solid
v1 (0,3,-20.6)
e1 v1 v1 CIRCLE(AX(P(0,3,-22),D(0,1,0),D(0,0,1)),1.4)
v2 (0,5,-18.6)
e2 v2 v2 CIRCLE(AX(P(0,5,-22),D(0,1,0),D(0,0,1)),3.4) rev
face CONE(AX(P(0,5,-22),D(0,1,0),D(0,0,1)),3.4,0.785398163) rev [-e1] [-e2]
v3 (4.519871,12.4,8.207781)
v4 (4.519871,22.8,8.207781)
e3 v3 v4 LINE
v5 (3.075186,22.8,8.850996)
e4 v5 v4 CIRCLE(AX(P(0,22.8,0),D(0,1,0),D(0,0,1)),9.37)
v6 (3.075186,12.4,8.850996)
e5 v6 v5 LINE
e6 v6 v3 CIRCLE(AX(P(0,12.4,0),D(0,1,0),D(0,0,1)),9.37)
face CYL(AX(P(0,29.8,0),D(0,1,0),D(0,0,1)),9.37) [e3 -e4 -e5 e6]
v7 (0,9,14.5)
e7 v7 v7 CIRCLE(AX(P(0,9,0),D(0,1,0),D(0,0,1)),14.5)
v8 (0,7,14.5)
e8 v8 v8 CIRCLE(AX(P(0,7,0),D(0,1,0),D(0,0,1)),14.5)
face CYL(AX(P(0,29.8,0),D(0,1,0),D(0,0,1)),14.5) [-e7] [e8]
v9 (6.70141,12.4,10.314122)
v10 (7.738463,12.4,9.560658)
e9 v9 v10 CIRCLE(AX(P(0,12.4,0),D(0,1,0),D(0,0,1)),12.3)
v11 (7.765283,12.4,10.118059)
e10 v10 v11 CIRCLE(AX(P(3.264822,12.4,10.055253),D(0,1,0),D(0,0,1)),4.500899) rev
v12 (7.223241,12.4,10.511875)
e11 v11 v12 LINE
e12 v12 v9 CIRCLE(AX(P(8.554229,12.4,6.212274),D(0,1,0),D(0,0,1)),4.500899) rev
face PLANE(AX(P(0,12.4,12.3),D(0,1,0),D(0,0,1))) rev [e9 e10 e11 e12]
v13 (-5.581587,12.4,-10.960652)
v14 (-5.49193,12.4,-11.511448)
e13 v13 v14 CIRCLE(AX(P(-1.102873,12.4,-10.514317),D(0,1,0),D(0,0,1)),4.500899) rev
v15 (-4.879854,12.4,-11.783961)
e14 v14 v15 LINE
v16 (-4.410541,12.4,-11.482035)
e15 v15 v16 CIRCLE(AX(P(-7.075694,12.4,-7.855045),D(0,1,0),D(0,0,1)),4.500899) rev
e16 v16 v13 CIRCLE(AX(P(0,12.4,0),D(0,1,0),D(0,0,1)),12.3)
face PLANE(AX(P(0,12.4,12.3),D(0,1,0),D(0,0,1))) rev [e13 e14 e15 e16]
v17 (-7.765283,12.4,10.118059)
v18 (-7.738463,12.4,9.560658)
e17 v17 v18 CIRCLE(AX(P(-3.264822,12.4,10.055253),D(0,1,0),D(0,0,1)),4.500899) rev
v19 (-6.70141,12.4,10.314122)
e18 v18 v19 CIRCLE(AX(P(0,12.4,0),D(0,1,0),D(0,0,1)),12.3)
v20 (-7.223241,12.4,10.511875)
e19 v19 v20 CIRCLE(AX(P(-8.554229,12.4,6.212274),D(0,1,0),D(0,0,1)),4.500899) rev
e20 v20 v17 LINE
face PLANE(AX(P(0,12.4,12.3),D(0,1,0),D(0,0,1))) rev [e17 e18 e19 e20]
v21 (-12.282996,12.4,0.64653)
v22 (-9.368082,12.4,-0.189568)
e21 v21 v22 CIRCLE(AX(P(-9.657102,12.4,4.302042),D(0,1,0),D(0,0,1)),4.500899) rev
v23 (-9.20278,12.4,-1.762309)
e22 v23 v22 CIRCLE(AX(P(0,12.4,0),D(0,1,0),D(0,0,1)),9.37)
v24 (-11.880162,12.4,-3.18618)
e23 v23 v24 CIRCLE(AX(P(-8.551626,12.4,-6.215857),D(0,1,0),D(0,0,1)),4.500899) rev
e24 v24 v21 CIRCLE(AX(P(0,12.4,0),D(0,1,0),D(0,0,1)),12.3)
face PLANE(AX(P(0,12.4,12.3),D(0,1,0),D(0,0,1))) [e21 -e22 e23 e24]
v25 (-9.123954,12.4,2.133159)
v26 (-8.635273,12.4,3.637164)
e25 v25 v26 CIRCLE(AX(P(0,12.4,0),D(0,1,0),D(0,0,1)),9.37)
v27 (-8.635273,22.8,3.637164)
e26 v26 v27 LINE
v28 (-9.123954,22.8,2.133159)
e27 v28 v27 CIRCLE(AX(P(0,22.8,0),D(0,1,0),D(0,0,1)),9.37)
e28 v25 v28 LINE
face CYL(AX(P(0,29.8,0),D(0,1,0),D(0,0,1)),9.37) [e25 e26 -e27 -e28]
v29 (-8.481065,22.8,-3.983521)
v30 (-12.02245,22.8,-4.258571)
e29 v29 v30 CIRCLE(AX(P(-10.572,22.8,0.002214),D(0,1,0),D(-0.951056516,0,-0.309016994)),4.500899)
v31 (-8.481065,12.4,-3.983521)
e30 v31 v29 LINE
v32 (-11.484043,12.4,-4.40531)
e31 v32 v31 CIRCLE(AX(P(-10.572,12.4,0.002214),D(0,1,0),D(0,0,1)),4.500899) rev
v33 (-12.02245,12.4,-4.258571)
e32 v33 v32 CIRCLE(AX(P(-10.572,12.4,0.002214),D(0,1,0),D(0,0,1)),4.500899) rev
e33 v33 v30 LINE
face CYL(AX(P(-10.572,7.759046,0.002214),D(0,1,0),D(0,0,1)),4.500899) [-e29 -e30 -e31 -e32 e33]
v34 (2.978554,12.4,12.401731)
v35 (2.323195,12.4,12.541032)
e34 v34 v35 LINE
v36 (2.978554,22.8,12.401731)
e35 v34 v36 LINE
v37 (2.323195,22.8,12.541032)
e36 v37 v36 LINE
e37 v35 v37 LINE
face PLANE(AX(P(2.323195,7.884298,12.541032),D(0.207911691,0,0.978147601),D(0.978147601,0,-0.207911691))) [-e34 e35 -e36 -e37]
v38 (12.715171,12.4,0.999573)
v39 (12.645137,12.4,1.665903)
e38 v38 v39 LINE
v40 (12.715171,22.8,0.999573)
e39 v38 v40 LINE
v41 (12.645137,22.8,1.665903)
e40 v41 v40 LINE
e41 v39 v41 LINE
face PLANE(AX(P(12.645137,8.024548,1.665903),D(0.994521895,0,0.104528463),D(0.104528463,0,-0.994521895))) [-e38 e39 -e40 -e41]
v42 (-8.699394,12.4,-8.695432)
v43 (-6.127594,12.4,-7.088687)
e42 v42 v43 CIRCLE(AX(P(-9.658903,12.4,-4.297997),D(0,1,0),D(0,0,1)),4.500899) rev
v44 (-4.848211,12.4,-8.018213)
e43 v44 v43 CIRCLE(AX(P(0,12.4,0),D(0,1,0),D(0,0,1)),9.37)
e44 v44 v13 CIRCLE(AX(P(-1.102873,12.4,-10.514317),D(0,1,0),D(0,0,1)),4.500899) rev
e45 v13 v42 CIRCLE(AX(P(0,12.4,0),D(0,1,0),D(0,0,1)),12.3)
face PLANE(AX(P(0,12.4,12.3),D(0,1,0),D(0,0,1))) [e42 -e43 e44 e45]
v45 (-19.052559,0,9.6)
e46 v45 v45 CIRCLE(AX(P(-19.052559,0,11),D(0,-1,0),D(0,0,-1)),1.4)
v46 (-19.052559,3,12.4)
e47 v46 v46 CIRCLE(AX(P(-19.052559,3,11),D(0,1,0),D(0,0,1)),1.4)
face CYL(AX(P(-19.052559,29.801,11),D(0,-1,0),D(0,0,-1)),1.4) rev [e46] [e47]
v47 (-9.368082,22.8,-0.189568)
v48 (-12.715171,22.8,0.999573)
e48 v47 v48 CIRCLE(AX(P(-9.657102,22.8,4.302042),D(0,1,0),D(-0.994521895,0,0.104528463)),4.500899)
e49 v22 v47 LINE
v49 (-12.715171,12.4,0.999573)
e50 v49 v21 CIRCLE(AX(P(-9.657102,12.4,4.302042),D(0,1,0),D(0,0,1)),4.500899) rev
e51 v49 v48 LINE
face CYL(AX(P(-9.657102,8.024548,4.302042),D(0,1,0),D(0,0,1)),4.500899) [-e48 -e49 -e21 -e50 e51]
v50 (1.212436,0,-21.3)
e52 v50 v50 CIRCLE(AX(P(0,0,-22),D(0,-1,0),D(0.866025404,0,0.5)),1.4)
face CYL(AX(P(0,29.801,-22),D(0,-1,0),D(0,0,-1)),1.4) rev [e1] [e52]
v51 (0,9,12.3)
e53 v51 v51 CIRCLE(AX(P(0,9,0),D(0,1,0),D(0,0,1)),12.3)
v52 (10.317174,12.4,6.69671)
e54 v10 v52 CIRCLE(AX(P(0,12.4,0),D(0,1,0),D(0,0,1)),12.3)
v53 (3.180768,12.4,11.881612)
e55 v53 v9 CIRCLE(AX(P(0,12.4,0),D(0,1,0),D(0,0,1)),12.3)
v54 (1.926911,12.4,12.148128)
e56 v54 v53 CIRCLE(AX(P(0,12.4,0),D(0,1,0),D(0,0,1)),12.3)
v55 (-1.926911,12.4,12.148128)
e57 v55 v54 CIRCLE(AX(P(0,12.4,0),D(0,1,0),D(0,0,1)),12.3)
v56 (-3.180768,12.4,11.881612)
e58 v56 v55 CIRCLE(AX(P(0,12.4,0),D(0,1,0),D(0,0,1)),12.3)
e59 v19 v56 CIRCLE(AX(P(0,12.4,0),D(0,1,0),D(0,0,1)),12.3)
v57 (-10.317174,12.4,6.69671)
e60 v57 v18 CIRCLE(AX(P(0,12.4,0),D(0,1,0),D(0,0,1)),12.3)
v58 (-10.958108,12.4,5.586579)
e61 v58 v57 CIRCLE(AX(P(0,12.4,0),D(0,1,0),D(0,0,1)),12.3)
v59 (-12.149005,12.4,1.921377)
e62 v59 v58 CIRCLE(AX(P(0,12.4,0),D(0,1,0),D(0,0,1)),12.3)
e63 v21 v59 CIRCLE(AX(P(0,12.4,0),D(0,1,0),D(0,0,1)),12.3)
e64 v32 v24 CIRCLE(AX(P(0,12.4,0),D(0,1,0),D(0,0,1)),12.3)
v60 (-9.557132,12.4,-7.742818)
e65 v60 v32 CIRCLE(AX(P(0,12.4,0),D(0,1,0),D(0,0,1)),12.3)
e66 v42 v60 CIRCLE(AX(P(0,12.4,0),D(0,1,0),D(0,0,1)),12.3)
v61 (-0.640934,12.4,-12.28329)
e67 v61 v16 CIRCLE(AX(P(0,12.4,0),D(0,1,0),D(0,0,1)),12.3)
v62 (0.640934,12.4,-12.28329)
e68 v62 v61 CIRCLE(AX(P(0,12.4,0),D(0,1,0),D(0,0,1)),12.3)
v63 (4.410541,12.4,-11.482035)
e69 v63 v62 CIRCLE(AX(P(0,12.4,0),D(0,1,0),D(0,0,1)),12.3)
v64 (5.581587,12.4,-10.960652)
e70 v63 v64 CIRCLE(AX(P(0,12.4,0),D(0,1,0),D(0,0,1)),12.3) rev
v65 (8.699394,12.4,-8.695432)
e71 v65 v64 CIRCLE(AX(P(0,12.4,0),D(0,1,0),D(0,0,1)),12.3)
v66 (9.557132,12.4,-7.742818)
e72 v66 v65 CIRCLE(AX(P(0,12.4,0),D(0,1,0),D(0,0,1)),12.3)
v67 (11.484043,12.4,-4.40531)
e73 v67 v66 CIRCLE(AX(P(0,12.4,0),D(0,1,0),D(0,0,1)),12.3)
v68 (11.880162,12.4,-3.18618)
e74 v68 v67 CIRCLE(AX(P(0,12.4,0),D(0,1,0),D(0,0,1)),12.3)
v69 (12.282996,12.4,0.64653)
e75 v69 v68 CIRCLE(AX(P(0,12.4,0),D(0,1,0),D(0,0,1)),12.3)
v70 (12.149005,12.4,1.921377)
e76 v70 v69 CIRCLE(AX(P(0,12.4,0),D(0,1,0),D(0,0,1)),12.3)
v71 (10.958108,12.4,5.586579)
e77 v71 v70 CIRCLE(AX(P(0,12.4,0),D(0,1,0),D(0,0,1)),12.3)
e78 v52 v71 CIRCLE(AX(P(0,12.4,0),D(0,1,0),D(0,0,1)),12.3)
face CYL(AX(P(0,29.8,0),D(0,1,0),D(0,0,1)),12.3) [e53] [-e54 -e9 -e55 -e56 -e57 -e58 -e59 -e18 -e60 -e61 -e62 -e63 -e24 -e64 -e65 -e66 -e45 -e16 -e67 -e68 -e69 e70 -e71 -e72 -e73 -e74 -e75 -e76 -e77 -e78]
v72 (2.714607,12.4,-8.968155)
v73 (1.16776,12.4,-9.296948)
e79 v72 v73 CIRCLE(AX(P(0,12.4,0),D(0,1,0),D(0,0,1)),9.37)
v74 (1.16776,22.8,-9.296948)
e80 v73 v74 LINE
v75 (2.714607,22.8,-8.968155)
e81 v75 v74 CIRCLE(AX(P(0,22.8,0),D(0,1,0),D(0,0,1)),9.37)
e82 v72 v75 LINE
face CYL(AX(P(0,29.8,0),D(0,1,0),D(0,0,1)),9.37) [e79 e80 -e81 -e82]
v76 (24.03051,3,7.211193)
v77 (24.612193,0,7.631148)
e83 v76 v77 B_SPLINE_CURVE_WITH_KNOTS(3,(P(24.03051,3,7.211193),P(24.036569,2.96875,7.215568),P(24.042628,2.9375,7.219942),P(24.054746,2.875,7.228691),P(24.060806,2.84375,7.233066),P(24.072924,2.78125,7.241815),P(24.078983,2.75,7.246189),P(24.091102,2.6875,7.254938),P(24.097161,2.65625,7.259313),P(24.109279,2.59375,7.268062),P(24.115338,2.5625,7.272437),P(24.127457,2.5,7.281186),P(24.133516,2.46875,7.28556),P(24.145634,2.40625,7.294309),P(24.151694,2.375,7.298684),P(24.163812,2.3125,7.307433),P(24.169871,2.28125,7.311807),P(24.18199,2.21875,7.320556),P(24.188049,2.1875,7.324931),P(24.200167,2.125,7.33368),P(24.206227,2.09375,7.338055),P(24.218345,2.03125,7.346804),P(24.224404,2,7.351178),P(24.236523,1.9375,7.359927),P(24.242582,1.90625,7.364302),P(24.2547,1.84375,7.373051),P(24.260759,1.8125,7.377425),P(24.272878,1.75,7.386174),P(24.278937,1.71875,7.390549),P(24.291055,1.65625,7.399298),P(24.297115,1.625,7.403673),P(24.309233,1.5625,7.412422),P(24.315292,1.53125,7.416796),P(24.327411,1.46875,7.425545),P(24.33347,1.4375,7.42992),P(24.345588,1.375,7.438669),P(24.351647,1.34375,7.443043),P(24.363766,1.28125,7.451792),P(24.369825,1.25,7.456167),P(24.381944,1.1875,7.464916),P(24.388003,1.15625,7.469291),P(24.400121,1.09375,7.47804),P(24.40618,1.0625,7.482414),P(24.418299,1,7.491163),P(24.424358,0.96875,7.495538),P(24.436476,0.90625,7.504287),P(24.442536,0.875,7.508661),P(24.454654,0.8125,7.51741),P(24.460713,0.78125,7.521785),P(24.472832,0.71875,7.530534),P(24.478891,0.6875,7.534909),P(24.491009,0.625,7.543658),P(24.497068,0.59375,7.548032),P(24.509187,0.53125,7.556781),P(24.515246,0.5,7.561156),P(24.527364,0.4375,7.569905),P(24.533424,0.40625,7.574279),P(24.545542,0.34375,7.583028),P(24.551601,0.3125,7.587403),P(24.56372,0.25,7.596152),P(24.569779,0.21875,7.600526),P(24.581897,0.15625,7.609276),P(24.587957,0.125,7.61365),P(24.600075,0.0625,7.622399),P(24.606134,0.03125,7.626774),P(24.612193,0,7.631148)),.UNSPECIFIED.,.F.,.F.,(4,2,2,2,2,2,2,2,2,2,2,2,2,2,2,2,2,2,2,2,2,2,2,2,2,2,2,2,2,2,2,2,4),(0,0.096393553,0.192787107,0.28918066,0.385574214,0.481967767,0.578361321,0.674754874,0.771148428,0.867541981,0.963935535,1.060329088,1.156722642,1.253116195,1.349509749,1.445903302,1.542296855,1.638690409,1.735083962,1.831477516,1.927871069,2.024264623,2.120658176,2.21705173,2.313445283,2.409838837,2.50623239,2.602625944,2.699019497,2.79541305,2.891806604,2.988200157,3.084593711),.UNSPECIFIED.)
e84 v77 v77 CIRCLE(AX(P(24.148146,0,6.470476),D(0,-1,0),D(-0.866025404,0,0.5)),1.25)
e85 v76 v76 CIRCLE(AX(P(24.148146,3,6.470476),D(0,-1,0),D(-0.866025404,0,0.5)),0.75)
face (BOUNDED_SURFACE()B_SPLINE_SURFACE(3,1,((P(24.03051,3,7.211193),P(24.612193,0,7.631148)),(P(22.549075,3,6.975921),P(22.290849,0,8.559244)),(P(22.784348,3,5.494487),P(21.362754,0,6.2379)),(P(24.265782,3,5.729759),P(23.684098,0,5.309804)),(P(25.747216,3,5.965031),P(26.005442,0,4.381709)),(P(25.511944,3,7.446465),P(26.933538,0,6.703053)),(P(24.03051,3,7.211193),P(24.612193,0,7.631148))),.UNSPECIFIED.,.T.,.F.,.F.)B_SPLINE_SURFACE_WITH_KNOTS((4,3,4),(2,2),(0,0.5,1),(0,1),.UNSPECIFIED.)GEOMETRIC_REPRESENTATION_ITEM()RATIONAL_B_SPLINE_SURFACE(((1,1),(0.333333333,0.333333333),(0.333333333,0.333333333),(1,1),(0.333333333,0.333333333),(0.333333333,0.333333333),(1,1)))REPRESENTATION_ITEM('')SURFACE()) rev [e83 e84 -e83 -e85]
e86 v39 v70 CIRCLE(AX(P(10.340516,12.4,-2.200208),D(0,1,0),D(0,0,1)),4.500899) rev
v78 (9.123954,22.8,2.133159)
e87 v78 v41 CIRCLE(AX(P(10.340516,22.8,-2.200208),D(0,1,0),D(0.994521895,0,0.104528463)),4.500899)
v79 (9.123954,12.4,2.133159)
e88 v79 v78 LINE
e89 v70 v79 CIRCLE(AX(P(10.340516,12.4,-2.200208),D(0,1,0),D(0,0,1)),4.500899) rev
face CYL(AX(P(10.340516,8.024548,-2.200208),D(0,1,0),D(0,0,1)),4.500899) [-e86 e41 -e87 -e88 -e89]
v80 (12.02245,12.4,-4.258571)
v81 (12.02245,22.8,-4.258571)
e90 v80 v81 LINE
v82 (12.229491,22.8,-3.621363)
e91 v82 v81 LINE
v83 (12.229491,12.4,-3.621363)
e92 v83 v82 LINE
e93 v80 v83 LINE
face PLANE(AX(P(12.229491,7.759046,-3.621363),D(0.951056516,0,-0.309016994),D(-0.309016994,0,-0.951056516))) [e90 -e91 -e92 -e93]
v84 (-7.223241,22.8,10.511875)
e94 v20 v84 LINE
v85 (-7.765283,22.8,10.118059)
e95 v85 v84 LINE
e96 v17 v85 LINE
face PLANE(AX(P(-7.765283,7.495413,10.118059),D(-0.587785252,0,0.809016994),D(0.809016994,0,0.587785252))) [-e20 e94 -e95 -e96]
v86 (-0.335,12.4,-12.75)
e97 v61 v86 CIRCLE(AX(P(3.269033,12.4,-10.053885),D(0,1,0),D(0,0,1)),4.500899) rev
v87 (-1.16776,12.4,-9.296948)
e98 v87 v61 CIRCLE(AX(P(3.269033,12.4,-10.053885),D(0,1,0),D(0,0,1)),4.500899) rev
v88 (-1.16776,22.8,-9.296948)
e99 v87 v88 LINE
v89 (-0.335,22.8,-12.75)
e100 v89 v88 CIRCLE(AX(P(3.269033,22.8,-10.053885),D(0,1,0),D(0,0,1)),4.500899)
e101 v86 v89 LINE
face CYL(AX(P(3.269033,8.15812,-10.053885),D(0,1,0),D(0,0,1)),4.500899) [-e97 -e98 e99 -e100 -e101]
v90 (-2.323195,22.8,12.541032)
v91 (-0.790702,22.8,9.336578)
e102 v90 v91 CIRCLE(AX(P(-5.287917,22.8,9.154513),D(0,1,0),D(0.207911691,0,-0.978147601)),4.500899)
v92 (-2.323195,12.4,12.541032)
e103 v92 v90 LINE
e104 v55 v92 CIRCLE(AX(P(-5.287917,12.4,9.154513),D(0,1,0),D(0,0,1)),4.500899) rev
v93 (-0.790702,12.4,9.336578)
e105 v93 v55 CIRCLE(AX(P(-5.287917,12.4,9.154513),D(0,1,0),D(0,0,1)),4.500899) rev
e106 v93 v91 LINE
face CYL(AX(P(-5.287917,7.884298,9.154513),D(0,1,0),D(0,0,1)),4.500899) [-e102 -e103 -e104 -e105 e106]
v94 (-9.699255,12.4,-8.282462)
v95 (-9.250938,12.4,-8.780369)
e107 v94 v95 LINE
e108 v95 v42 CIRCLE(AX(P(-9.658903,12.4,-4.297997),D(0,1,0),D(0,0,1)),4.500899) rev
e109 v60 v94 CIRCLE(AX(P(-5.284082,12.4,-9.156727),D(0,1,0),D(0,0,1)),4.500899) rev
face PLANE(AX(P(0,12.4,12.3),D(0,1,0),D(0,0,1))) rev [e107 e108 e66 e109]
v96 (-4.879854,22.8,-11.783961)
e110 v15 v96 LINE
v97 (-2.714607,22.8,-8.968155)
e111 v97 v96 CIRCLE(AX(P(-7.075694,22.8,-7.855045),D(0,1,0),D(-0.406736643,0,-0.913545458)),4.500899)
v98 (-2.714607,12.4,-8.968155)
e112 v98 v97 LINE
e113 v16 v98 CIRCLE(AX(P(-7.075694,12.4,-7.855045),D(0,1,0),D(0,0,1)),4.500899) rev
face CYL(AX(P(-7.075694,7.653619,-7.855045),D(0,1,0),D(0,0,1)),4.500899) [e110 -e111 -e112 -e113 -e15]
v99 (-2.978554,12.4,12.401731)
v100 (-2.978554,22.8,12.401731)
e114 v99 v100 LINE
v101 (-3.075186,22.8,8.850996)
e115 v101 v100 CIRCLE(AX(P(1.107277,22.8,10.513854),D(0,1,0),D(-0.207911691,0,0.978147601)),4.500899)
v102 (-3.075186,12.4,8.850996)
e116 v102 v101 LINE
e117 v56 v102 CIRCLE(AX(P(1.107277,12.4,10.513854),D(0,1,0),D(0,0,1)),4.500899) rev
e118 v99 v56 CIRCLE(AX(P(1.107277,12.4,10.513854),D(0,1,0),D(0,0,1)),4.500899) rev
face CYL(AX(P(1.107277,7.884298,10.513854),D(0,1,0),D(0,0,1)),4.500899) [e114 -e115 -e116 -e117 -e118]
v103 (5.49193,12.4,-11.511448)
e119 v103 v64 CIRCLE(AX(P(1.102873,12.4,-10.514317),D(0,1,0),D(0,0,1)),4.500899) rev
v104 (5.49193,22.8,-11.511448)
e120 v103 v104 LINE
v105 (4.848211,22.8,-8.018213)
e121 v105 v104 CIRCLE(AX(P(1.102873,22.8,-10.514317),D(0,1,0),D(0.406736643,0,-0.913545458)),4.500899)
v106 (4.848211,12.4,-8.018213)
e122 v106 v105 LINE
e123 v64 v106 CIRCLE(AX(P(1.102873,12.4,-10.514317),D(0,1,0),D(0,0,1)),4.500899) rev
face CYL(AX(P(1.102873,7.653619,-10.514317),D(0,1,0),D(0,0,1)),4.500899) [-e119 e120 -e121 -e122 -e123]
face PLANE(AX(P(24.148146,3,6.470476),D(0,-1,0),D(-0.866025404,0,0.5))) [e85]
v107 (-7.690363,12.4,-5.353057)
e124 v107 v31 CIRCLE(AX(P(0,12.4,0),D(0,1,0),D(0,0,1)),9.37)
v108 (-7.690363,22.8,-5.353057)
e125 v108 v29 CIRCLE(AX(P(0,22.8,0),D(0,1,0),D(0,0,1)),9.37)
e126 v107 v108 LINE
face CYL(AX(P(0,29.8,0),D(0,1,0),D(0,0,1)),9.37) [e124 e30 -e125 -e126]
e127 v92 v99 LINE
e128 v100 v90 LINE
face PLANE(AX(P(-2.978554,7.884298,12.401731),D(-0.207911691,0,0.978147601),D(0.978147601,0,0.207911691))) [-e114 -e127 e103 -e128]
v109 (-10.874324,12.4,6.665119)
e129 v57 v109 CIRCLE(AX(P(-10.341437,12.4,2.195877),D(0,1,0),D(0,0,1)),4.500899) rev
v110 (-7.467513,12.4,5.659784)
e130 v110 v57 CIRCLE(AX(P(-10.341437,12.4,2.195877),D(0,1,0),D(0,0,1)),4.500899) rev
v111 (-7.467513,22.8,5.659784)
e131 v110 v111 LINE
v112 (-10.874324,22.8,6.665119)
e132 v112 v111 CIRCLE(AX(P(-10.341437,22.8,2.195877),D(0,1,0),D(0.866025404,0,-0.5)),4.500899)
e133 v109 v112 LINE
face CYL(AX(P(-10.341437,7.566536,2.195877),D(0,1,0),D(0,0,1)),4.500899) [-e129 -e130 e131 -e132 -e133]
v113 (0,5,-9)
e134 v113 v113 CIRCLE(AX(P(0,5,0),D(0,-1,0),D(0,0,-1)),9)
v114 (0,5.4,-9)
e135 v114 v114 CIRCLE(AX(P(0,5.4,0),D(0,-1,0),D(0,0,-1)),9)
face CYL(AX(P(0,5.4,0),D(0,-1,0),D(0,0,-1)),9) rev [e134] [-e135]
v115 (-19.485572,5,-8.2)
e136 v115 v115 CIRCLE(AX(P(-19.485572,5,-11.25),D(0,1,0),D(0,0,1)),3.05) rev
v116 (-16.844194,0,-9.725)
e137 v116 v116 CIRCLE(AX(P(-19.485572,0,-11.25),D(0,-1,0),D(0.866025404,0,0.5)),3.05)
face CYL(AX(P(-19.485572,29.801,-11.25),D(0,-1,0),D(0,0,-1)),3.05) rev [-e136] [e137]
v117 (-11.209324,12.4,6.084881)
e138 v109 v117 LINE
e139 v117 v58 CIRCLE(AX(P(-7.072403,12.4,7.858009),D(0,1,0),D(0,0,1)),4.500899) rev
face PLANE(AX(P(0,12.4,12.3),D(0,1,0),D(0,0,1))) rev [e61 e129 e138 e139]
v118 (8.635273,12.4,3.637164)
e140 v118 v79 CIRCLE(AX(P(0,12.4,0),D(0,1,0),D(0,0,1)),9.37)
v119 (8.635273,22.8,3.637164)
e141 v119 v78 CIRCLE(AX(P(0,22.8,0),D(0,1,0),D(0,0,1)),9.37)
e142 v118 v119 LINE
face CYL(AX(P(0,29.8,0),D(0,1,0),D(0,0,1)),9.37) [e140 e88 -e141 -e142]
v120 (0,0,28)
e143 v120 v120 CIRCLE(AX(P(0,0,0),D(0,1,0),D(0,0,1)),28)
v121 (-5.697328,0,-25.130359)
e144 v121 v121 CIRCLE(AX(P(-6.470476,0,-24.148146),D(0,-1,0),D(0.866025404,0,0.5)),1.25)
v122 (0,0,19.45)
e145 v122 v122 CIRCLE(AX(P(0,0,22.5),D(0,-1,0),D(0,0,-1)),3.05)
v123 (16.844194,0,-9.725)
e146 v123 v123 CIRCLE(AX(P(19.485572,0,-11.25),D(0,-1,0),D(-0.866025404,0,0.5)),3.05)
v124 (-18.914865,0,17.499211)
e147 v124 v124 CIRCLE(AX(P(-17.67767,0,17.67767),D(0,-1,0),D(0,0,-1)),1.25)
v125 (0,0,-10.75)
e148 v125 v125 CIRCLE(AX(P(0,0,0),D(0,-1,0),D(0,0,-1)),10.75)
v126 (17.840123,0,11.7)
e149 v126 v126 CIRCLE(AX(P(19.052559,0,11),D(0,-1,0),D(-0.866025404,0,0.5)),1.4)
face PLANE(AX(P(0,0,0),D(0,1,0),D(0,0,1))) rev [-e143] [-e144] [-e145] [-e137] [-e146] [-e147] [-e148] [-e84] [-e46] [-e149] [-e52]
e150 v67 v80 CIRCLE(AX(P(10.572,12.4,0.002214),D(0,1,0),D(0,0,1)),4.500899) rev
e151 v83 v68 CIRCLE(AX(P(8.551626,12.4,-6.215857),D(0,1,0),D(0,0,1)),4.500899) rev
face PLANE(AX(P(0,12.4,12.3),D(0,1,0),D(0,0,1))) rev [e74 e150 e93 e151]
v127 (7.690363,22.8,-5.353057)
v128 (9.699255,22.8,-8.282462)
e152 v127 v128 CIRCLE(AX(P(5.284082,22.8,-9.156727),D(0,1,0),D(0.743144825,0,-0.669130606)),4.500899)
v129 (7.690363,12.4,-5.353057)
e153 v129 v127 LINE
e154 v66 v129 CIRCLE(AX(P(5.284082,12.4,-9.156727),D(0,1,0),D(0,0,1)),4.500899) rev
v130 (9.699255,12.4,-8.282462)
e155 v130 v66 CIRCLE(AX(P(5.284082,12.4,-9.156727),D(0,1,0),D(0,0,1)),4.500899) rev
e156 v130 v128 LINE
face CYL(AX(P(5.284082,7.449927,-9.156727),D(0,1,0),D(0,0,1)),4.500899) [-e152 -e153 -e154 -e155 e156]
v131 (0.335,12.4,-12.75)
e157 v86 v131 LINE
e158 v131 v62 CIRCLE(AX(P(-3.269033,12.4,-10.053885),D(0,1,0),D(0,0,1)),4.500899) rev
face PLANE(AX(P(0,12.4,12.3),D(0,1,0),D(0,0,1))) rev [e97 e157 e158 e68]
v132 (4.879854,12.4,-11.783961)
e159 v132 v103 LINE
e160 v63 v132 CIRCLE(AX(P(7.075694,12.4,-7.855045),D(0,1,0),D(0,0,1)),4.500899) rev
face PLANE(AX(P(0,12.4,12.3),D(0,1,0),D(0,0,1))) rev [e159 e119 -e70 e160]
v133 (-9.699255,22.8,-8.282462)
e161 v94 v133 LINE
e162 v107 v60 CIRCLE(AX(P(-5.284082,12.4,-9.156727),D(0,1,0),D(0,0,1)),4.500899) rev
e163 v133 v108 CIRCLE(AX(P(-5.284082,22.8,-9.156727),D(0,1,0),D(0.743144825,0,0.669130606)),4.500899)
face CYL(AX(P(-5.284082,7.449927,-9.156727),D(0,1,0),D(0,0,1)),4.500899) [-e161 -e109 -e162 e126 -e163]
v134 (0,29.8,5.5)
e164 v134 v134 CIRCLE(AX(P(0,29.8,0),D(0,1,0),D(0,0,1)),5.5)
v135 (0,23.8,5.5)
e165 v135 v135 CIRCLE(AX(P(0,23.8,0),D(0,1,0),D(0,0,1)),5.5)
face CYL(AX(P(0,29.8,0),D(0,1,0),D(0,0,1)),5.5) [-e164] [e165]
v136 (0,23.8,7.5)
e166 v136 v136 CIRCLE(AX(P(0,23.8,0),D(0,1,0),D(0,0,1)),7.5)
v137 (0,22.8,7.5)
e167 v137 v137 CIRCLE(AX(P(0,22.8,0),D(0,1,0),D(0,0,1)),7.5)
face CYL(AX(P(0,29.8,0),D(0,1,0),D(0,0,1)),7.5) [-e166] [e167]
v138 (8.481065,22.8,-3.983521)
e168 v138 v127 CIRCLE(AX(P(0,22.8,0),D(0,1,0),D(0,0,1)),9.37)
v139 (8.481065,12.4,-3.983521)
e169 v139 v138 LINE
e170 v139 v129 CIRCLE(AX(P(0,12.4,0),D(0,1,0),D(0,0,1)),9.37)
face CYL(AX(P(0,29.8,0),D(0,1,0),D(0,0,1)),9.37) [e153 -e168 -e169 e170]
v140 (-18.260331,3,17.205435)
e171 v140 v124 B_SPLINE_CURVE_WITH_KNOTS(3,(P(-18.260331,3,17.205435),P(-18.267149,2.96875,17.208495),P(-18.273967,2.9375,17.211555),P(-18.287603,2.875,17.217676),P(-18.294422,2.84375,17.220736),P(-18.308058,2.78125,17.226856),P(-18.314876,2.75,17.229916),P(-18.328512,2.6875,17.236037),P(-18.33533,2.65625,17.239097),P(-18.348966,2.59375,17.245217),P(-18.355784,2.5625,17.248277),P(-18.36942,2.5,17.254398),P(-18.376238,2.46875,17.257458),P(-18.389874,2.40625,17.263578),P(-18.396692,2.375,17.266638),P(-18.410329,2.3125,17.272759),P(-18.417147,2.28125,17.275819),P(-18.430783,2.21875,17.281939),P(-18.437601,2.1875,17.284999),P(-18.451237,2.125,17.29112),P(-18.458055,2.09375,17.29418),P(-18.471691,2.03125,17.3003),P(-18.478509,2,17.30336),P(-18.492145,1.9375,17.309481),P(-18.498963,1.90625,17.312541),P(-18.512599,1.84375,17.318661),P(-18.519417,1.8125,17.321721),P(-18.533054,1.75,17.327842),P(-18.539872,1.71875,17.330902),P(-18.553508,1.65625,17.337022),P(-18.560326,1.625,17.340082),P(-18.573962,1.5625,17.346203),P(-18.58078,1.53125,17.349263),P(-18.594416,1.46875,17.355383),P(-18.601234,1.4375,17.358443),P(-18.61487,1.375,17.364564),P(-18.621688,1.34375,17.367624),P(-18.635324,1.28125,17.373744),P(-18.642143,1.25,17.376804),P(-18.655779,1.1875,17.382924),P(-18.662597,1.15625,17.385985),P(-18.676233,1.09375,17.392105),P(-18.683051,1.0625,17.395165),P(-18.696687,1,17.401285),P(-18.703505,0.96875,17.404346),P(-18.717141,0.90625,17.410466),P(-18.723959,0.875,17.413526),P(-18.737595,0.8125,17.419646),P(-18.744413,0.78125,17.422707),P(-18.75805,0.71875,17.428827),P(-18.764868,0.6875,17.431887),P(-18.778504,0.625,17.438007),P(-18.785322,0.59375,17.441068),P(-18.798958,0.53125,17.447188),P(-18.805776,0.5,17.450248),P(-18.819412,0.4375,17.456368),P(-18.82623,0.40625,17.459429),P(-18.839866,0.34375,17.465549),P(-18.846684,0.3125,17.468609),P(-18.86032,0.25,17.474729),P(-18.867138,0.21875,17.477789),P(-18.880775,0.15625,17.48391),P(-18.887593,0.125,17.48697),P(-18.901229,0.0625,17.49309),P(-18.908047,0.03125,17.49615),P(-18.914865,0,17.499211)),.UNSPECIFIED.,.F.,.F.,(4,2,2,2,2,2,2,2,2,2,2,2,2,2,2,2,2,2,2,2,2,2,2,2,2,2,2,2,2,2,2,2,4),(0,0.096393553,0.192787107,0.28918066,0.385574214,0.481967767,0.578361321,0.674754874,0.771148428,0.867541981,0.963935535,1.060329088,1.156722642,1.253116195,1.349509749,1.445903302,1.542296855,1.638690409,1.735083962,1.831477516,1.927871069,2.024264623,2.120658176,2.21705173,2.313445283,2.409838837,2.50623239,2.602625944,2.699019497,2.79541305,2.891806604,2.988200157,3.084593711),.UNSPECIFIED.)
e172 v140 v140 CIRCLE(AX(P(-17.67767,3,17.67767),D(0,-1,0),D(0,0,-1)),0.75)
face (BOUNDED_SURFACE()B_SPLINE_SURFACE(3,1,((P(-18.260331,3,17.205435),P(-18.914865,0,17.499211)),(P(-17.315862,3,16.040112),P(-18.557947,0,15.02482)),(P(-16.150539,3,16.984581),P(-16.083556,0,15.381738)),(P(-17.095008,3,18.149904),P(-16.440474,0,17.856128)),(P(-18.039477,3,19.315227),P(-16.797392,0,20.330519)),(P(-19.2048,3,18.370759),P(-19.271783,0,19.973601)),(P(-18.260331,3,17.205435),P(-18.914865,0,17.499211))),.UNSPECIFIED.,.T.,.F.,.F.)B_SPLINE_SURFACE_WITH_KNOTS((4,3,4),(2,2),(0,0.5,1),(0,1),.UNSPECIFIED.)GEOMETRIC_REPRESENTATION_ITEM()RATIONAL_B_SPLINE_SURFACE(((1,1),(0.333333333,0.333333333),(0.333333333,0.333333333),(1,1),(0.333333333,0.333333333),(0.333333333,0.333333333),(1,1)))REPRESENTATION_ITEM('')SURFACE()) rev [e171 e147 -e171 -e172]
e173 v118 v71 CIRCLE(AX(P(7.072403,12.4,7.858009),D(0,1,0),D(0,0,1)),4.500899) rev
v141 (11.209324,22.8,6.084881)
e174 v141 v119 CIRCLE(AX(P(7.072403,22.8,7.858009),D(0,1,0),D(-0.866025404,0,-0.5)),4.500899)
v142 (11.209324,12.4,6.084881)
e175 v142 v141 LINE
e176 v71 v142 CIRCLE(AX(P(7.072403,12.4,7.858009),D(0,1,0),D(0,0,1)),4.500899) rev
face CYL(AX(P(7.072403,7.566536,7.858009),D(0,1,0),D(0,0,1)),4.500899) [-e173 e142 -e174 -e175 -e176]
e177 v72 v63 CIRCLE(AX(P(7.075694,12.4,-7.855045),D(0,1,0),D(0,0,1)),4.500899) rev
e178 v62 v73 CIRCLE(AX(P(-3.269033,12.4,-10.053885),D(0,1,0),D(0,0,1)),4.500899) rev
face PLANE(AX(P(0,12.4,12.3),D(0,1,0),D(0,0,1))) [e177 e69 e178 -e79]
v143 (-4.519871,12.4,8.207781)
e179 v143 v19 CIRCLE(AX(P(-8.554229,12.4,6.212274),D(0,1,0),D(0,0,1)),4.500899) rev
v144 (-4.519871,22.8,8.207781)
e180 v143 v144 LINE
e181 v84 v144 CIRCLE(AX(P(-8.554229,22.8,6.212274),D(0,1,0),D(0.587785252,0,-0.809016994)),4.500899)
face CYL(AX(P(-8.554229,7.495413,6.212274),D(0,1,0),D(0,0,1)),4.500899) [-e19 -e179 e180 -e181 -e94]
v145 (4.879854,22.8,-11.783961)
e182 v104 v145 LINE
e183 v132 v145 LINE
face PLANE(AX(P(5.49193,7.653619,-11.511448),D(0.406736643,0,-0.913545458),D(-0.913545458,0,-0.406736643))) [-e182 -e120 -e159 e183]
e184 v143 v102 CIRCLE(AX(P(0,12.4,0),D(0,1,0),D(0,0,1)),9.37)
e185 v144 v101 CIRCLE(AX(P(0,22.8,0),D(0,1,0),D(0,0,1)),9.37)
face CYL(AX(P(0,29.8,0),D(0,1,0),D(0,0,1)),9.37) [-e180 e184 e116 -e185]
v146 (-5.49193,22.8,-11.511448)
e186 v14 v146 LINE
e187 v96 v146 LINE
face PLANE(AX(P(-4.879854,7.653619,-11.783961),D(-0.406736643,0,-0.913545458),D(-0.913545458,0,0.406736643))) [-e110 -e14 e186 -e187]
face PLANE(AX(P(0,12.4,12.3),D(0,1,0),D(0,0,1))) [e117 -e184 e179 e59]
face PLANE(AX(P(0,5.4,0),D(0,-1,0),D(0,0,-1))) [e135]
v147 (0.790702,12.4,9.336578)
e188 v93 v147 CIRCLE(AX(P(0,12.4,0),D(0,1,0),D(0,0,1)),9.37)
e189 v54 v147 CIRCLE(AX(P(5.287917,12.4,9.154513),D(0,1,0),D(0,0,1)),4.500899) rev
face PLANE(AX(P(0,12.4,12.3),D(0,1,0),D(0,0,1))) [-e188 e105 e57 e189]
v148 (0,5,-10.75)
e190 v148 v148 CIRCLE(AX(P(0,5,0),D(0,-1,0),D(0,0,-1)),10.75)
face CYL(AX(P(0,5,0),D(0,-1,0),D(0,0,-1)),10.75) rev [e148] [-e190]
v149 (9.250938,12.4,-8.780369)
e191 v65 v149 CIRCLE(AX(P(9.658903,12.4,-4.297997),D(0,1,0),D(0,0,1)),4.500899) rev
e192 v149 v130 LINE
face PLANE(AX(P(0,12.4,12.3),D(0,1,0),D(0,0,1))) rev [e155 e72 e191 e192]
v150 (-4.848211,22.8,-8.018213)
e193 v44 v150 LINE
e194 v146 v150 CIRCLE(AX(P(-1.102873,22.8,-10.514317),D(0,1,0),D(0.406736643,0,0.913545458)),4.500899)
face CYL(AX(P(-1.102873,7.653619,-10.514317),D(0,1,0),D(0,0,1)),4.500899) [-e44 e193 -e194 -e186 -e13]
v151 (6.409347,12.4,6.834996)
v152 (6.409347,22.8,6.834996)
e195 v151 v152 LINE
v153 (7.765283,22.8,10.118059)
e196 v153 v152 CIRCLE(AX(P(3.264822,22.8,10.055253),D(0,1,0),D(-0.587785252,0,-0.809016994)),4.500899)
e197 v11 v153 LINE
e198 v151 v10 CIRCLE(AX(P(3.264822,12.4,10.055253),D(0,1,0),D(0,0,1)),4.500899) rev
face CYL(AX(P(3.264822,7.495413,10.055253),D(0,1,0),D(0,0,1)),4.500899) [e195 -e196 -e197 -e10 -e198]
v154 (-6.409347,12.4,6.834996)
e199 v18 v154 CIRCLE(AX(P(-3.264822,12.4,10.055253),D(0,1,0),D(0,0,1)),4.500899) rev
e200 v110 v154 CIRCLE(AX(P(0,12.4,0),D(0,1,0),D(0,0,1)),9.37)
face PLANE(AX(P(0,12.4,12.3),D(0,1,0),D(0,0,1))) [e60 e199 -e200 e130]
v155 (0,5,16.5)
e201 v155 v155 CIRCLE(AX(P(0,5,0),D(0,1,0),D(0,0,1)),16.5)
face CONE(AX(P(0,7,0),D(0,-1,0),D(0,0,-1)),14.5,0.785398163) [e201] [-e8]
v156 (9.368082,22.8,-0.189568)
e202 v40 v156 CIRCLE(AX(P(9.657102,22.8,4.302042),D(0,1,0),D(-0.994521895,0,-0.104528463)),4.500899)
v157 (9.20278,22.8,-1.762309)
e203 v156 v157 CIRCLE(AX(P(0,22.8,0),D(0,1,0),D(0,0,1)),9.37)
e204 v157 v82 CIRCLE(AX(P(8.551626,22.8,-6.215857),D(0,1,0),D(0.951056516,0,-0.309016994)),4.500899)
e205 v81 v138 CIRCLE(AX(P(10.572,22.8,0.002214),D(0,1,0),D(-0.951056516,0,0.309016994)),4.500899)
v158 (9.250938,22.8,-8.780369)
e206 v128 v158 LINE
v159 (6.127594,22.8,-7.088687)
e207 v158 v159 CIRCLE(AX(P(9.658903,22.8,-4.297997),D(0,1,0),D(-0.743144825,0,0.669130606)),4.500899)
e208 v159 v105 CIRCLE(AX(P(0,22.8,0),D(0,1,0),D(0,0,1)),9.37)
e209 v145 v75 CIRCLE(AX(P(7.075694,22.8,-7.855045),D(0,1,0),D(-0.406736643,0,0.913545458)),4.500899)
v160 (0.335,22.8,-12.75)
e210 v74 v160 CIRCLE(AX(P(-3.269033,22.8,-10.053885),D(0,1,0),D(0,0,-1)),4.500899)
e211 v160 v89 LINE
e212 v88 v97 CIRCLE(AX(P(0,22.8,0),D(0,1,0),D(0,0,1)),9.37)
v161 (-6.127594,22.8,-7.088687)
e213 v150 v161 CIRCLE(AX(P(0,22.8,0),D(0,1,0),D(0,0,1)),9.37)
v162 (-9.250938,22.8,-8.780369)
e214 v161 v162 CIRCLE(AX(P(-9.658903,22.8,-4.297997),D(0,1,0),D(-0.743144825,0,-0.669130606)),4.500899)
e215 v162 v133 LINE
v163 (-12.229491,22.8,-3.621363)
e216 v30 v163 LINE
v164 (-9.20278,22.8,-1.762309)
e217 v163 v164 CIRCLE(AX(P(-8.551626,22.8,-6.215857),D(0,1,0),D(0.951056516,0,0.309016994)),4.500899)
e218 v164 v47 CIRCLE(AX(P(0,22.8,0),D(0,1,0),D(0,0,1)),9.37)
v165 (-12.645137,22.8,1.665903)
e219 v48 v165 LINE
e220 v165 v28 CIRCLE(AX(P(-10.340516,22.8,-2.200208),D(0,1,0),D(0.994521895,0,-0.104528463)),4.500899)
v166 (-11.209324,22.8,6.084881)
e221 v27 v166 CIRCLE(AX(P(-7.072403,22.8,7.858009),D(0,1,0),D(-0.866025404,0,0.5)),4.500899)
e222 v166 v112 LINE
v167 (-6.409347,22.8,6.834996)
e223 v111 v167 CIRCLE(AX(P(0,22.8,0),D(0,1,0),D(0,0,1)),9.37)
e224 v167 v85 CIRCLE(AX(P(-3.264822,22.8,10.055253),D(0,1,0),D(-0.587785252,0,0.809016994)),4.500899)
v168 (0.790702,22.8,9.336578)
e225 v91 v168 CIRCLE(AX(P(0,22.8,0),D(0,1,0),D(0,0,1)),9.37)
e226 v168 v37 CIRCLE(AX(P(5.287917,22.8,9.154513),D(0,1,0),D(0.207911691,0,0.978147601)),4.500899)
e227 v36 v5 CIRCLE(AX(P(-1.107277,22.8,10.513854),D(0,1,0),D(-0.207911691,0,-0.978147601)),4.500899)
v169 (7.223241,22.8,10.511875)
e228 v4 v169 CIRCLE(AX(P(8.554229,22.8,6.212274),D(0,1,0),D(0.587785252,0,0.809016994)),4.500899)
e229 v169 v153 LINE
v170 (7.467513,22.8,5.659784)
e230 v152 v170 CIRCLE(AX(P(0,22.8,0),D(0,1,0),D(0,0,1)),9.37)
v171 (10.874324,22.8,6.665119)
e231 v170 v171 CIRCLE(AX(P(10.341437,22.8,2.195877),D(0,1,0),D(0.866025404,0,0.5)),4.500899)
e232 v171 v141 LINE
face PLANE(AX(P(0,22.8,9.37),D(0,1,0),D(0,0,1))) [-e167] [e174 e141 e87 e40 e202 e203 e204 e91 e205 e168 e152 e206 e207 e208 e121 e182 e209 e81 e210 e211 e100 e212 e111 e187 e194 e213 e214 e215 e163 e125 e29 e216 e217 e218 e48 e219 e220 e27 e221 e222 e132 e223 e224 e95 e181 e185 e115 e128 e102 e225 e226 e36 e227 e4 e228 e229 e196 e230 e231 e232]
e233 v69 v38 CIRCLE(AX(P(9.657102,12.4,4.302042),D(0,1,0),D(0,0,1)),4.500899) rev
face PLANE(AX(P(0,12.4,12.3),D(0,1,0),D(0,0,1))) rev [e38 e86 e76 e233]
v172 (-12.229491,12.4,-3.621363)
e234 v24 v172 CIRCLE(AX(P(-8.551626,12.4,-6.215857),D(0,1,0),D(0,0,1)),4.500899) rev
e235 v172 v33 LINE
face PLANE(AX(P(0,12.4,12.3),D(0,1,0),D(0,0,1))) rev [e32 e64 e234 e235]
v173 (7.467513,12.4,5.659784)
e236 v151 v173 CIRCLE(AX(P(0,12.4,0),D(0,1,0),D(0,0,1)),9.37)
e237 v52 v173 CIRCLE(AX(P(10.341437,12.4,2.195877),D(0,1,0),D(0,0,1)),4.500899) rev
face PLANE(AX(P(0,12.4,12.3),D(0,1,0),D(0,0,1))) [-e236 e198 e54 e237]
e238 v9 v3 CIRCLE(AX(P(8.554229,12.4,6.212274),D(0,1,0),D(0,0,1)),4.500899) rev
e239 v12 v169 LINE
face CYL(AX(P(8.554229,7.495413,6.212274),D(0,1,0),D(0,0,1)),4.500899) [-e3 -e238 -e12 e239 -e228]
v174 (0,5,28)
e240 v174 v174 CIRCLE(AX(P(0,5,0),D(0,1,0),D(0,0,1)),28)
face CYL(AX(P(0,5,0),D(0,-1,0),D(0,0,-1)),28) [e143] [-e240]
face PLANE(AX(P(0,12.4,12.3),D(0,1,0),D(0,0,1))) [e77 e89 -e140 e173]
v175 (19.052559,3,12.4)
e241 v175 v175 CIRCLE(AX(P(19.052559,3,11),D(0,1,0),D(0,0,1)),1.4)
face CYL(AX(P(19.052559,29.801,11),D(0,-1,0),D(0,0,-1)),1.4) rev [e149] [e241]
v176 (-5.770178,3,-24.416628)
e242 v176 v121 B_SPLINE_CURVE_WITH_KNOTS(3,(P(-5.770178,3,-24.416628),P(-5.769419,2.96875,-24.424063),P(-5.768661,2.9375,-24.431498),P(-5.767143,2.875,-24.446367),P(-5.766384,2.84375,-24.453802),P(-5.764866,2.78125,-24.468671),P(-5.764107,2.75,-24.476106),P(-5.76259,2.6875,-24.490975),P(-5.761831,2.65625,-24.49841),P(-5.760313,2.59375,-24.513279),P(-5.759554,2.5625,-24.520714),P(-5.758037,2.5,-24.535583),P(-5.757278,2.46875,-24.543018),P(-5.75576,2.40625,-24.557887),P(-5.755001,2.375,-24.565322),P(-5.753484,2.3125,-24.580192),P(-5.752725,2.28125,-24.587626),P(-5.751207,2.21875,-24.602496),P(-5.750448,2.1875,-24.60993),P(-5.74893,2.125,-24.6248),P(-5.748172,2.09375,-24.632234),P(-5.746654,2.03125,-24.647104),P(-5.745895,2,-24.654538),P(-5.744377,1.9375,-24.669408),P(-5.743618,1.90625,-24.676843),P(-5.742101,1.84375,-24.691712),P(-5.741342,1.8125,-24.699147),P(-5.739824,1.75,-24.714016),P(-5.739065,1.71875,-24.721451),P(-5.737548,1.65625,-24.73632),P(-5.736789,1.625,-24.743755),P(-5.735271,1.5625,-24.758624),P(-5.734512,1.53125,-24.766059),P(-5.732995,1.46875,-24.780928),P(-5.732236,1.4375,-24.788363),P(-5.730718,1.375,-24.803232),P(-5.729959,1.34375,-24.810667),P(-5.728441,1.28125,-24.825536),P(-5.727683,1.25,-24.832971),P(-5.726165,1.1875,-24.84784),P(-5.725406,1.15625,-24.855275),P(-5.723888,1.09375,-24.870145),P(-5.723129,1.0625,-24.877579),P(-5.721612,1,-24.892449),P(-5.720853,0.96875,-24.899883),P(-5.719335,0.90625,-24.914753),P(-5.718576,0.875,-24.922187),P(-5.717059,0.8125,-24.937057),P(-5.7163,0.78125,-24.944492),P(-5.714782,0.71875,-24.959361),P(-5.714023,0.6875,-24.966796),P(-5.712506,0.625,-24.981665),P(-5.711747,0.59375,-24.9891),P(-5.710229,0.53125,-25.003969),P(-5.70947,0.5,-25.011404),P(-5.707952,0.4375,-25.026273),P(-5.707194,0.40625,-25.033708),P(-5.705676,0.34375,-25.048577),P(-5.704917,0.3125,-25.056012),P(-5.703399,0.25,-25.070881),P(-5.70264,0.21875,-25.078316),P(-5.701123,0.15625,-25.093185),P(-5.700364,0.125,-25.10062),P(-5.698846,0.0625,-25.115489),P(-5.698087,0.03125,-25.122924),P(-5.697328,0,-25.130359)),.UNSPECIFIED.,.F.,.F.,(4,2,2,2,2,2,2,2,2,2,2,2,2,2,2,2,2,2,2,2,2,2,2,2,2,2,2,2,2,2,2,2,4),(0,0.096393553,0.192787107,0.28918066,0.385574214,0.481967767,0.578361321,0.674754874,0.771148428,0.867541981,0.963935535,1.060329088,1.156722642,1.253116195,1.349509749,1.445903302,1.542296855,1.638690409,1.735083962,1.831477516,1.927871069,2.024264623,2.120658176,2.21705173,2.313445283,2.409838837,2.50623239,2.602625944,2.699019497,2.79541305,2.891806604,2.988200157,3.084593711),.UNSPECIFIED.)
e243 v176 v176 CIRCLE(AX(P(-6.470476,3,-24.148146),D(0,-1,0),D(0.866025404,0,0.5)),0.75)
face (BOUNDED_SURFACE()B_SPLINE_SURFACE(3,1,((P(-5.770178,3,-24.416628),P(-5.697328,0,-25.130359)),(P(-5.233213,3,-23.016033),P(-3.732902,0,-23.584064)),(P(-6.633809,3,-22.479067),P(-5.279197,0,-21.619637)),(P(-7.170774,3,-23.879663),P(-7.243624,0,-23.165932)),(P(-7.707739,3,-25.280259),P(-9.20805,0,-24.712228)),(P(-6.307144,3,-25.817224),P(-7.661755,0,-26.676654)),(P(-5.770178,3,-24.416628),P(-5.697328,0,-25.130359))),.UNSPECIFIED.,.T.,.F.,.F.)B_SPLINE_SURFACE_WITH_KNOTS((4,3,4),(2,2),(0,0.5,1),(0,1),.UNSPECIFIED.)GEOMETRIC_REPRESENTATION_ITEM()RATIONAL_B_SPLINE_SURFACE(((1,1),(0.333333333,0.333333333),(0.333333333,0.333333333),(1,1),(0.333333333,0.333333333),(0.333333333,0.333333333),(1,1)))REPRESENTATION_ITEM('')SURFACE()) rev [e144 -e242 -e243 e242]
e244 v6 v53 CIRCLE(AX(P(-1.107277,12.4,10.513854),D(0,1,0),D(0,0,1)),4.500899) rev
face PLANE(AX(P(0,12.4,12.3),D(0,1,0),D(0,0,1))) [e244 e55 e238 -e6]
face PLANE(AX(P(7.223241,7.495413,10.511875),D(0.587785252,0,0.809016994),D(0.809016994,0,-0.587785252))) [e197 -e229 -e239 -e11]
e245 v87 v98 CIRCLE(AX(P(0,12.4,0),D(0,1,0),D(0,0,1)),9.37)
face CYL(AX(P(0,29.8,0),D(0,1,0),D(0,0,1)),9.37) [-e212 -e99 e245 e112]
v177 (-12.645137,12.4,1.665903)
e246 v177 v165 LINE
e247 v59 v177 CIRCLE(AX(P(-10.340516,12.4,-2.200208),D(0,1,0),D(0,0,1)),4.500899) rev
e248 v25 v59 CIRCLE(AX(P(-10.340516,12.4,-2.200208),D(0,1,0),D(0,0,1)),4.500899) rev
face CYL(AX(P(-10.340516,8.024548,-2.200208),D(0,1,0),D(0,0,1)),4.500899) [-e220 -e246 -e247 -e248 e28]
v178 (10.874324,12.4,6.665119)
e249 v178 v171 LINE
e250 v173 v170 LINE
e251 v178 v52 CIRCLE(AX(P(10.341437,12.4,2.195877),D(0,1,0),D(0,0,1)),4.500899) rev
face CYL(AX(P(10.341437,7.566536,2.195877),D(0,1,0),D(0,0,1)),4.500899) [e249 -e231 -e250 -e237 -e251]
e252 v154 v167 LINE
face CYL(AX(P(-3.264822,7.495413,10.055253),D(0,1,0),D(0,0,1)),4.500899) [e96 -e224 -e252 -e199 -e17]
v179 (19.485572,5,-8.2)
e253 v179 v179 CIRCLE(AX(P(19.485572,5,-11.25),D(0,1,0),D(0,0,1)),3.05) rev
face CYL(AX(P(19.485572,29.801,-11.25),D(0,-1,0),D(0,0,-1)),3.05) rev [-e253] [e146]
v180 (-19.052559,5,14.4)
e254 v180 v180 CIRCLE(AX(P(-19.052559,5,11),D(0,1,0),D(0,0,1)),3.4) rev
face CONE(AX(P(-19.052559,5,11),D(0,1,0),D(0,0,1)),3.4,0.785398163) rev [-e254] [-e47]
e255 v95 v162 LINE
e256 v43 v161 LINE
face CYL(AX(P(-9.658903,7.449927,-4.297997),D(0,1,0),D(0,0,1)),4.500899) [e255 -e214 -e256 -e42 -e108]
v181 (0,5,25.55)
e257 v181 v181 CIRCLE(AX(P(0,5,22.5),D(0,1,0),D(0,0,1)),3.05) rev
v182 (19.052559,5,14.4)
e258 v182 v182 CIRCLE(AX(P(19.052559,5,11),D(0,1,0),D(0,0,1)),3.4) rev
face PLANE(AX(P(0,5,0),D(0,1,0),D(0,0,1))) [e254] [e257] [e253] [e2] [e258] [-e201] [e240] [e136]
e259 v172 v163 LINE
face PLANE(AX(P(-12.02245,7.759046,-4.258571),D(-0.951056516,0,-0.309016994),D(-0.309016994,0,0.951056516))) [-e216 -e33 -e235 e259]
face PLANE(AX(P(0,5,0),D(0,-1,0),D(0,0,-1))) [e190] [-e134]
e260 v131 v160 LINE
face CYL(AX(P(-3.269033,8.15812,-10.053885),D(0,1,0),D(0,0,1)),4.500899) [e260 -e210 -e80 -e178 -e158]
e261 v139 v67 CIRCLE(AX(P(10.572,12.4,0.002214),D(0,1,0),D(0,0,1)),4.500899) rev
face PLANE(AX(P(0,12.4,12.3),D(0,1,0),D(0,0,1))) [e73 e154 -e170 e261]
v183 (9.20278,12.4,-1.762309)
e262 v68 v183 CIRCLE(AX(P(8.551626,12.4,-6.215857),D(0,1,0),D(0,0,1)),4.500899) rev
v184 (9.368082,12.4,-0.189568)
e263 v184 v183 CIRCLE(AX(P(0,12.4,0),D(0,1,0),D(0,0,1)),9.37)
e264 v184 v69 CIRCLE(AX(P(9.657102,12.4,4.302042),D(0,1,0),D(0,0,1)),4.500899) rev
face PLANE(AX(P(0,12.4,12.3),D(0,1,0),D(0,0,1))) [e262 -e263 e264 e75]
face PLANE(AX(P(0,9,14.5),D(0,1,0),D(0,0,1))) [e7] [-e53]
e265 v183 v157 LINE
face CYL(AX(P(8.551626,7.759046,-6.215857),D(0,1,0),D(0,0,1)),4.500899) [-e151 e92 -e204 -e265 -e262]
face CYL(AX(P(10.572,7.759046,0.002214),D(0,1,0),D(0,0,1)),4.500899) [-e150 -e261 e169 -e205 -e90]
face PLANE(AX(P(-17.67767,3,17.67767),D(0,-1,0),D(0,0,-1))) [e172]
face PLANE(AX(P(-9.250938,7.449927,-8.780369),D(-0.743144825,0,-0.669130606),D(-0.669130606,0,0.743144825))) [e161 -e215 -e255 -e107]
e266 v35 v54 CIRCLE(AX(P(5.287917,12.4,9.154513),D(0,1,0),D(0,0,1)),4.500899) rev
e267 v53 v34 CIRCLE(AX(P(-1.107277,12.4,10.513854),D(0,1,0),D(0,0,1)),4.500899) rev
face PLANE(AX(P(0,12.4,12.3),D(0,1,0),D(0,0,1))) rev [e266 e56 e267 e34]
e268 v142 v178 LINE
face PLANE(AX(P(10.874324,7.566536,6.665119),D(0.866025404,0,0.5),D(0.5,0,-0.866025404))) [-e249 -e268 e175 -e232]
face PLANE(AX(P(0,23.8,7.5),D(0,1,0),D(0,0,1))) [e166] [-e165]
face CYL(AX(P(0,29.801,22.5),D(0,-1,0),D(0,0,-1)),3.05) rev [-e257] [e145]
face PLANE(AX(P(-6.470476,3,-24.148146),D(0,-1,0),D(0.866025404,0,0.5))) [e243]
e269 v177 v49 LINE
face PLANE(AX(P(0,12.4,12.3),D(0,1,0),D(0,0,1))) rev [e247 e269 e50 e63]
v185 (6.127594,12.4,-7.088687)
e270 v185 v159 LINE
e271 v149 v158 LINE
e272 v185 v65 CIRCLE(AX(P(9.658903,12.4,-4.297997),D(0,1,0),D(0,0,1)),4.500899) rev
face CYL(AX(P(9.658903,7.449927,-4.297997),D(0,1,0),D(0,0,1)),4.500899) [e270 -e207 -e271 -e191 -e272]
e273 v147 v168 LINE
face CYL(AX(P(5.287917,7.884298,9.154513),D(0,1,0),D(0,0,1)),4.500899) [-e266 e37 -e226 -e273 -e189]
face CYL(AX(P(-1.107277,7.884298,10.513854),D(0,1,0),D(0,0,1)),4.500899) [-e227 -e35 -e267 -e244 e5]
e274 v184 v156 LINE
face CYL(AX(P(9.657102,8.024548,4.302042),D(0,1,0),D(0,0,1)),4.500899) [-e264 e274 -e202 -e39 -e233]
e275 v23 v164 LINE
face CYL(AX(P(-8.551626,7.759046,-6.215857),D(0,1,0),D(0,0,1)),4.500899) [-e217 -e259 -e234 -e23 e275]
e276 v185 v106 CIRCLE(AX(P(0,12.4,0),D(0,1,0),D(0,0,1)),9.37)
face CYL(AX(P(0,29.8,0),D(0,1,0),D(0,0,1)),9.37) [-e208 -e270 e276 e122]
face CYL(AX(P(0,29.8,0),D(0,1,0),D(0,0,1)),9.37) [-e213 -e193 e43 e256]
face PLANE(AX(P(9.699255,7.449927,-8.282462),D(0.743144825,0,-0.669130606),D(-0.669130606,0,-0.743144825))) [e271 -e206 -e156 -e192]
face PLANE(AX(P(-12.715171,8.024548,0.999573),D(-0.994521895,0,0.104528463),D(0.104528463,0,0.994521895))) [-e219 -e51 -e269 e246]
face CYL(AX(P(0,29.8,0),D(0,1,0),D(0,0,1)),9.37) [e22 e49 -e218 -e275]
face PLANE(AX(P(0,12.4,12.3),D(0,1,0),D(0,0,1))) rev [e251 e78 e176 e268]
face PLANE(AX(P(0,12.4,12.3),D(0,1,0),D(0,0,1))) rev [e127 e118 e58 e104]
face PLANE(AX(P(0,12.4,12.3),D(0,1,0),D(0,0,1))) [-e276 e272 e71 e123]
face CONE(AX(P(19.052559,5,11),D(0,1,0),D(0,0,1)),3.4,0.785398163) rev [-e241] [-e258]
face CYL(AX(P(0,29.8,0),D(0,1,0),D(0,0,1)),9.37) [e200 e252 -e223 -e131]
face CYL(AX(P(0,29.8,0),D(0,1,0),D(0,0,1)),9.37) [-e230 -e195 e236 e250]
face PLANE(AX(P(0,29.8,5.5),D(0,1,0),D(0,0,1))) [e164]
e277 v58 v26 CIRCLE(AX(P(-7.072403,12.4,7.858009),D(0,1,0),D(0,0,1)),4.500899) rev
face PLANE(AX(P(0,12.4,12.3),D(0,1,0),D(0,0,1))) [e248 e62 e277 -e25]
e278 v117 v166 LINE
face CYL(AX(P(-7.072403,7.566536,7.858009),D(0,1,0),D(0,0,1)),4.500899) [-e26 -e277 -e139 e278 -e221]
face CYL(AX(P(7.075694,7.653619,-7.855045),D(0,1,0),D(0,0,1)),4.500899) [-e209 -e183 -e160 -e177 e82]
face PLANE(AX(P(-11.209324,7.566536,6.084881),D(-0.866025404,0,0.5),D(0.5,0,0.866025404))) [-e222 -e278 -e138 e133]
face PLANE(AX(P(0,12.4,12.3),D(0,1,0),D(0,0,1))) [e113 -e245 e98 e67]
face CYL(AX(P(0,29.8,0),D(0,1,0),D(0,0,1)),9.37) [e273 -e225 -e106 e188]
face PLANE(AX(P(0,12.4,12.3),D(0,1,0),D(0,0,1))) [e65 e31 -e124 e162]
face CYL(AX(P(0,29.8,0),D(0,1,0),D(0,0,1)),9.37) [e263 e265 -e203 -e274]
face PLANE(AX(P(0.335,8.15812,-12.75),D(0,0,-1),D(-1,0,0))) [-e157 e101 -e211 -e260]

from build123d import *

# Parameters (mm, degrees)
ESBO_O1_R                = 28
RESSALTO_EXTRUS_O1_DEPTH = 5
ESBO_O6_R                = 10.75
CORTE_EXTRUS_O1_DEPTH    = 5
ESBO_O7_R                = 9
CORTE_EXTRUS_O2_DEPTH    = 0.4
CORTE_EXTRUS_O3_REACH    = 51.558
ESBO_O8_R                = 3.05
PADR_OCIRCULAR1_COUNT    = 3
CORTE_EXTRUS_O4_REACH    = 51.558
ESBO_O9_R                = 1.4
PADR_OCIRCULAR2_COUNT    = 3
PADR_OCIRCULAR3_COUNT    = 3
CHANFRO1_SIZE            = 2
CHANFRO2_SIZE            = 2
RESSALTO_EXTRUS_O2_DEPTH = 10.4
PADR_OCIRCULAR4_COUNT    = 15


with BuildPart() as part:
    # Esboço1 → Ressalto-extrusão1 (new body)
    with BuildSketch(Plane(origin=(0, 0, 0), x_dir=(1, 0, 0), z_dir=(0, 1, 0))):
        with Locations(Location((0, 0, 0), (0, 0, 270))):
            Circle(ESBO_O1_R)
    extrude(amount=RESSALTO_EXTRUS_O1_DEPTH)

    # Esboço5 → Revolução1 (revolve)
    with BuildSketch(Plane(origin=(0, 0, 0), x_dir=(0, 0, -1), z_dir=(1, 0, 0))):
        Polygon((0, 5), (-16.5, 5), (-14.5, 7), (-14.5, 9), (-12.3, 9), (-12.3, 12.4), (-9.37, 12.4), (-9.37, 22.8), (-7.5, 22.8), (-7.5, 23.8), (-5.5, 23.8), (-5.5, 29.8), (0, 29.8), align=None)
    revolve(axis=Axis((0, 29.8, 0), (0, -1, 0)))

    # Esboço6 → Corte-extrusão1 (cut)
    with BuildSketch(Plane.XZ):
        with Locations(Location((0, 0, 0), (0, 0, 270))):
            Circle(ESBO_O6_R)
    extrude(amount=-CORTE_EXTRUS_O1_DEPTH, mode=Mode.SUBTRACT)

    # Esboço7 → Corte-extrusão2 (cut)
    with BuildSketch(Plane.XZ.offset(-5)):
        with Locations(Location((0, 0, 0), (0, 0, 270))):
            Circle(ESBO_O7_R)
    extrude(amount=-CORTE_EXTRUS_O2_DEPTH, mode=Mode.SUBTRACT)

    # Esboço8 → Corte-extrusão3 (cut, up to next)
    with BuildSketch(Plane.XZ, mode=Mode.PRIVATE) as corte_extrus_o3_sk1:
        with Locations(Location((0, 22.5, 0), (0, 0, 270))):
            Circle(ESBO_O8_R)
    corte_extrus_o3_tool1 = extrude(corte_extrus_o3_sk1.sketch, amount=-CORTE_EXTRUS_O3_REACH, mode=Mode.PRIVATE) & part.part
    corte_extrus_o3 = corte_extrus_o3_tool1.solids().sort_by_distance((0, 0, 22.5))[0]
    add(corte_extrus_o3, mode=Mode.SUBTRACT)

    # PadrãoCircular1: Corte-extrusão3 ×3 about axis
    padr_ocircular1_axis = Axis((0, 0, 0), (0, 1, 0))
    for i in range(1, PADR_OCIRCULAR1_COUNT):
        add(corte_extrus_o3.rotate(padr_ocircular1_axis, i * 360 / PADR_OCIRCULAR1_COUNT), mode=Mode.SUBTRACT)

    # Esboço9 → Corte-extrusão4 (cut, up to next)
    with BuildSketch(Plane.XZ, mode=Mode.PRIVATE) as corte_extrus_o4_sk1:
        with Locations(Location((-19.052558883, 11, 0), (0, 0, 270))):
            Circle(ESBO_O9_R)
    corte_extrus_o4_tool1 = extrude(corte_extrus_o4_sk1.sketch, amount=-CORTE_EXTRUS_O4_REACH, mode=Mode.PRIVATE) & part.part
    corte_extrus_o4 = corte_extrus_o4_tool1.solids().sort_by_distance((-19.052559, 0, 11))[0]
    add(corte_extrus_o4, mode=Mode.SUBTRACT)

    # PadrãoCircular2: Corte-extrusão4 ×3 about axis
    padr_ocircular2_axis = Axis((0, 0, 0), (0, 1, 0))
    for i in range(1, PADR_OCIRCULAR2_COUNT):
        add(corte_extrus_o4.rotate(padr_ocircular2_axis, i * 360 / PADR_OCIRCULAR2_COUNT), mode=Mode.SUBTRACT)

    # Loft de corte1: read off the stored shape, not the designer's step
    # Loft de corte1: loft between two sections, ruled curve by curve
    loft_de_corte1_from = [
        Edge.make_bspline([(-18.260331243, 3, 17.20543513), (-17.315862444, 3, 16.040111704), (-16.150539018, 3, 16.984580503), (-17.095007817, 3, 18.149903929), (-18.039476615, 3, 19.315227355), (-19.204800042, 3, 18.370758556), (-18.260331243, 3, 17.20543513)], [0, 0, 0, 0, 0.5, 0.5, 0.5, 1, 1, 1, 1], 3, [1, 0.333333333, 0.333333333, 1, 0.333333333, 0.333333333, 1]),
    ]
    loft_de_corte1_to = [
        Edge.make_bspline([(-18.914864913, 0, 17.499210616), (-18.557947085, 0, 15.024819849), (-16.083556319, 0, 15.381737677), (-16.440474147, 0, 17.856128444), (-16.797391974, 0, 20.33051921), (-19.271782741, 0, 19.973601382), (-18.914864913, 0, 17.499210616)], [0, 0, 0, 0, 0.5, 0.5, 0.5, 1, 1, 1, 1], 3, [1, 0.333333333, 0.333333333, 1, 0.333333333, 0.333333333, 1]),
    ]
    loft_de_corte1 = Solid(Shell([*[Face.make_surface_from_curves(loft_de_corte1_from[k], loft_de_corte1_to[k]) for k in range(1)], Face(Wire(loft_de_corte1_from)), Face(Wire(loft_de_corte1_to))]))
    add(loft_de_corte1, mode=Mode.SUBTRACT)

    # PadrãoCircular3: Loft de corte1 ×3 about axis
    padr_ocircular3_axis = Axis((0, 0, 0), (0, 1, 0))
    for i in range(1, PADR_OCIRCULAR3_COUNT):
        add(loft_de_corte1.rotate(padr_ocircular3_axis, i * 360 / PADR_OCIRCULAR3_COUNT), mode=Mode.SUBTRACT)

    # Chanfro1
    chanfro1_edges = [part.edges().sort_by_distance(p)[0] for p in [
        (-19.052558883, 5, 12.4),
    ]]
    chamfer(chanfro1_edges, length=CHANFRO1_SIZE)

    # Chanfro2
    chanfro2_edges = [part.edges().sort_by_distance(p)[0] for p in [
        (20.264994449, 5, 10.3),
        (-1.212435565, 5, -22.7),
    ]]
    chamfer(chanfro2_edges, length=CHANFRO2_SIZE)

    # Esboço15 → Ressalto-extrusão2 (add)
    with BuildSketch(Plane(origin=(0, 22.8, 0), x_dir=(1, 0, 0), z_dir=(0, 1, 0))):
        with BuildLine():
            Line((0.335, 12.75), (-0.335, 12.75))
            ThreePointArc((-0.335, 12.75), (-1.106422887, 11.109098221), (-1.167760303, 9.296947664))
            ThreePointArc((-1.167760303, 9.296947664), (0, 9.37), (1.167760303, 9.296947664))
            ThreePointArc((1.167760303, 9.296947664), (1.106422887, 11.109098221), (0.335, 12.75))
        make_face()
    ressalto_extrus_o2 = extrude(amount=-RESSALTO_EXTRUS_O2_DEPTH)

    # PadrãoCircular4: Ressalto-extrusão2 ×15 about axis
    padr_ocircular4_axis = Axis((0, 0, 0), (0, 1, 0))
    for i in range(1, PADR_OCIRCULAR4_COUNT):
        add(ressalto_extrus_o2.rotate(padr_ocircular4_axis, i * 360 / PADR_OCIRCULAR4_COUNT))


solid = part.part
